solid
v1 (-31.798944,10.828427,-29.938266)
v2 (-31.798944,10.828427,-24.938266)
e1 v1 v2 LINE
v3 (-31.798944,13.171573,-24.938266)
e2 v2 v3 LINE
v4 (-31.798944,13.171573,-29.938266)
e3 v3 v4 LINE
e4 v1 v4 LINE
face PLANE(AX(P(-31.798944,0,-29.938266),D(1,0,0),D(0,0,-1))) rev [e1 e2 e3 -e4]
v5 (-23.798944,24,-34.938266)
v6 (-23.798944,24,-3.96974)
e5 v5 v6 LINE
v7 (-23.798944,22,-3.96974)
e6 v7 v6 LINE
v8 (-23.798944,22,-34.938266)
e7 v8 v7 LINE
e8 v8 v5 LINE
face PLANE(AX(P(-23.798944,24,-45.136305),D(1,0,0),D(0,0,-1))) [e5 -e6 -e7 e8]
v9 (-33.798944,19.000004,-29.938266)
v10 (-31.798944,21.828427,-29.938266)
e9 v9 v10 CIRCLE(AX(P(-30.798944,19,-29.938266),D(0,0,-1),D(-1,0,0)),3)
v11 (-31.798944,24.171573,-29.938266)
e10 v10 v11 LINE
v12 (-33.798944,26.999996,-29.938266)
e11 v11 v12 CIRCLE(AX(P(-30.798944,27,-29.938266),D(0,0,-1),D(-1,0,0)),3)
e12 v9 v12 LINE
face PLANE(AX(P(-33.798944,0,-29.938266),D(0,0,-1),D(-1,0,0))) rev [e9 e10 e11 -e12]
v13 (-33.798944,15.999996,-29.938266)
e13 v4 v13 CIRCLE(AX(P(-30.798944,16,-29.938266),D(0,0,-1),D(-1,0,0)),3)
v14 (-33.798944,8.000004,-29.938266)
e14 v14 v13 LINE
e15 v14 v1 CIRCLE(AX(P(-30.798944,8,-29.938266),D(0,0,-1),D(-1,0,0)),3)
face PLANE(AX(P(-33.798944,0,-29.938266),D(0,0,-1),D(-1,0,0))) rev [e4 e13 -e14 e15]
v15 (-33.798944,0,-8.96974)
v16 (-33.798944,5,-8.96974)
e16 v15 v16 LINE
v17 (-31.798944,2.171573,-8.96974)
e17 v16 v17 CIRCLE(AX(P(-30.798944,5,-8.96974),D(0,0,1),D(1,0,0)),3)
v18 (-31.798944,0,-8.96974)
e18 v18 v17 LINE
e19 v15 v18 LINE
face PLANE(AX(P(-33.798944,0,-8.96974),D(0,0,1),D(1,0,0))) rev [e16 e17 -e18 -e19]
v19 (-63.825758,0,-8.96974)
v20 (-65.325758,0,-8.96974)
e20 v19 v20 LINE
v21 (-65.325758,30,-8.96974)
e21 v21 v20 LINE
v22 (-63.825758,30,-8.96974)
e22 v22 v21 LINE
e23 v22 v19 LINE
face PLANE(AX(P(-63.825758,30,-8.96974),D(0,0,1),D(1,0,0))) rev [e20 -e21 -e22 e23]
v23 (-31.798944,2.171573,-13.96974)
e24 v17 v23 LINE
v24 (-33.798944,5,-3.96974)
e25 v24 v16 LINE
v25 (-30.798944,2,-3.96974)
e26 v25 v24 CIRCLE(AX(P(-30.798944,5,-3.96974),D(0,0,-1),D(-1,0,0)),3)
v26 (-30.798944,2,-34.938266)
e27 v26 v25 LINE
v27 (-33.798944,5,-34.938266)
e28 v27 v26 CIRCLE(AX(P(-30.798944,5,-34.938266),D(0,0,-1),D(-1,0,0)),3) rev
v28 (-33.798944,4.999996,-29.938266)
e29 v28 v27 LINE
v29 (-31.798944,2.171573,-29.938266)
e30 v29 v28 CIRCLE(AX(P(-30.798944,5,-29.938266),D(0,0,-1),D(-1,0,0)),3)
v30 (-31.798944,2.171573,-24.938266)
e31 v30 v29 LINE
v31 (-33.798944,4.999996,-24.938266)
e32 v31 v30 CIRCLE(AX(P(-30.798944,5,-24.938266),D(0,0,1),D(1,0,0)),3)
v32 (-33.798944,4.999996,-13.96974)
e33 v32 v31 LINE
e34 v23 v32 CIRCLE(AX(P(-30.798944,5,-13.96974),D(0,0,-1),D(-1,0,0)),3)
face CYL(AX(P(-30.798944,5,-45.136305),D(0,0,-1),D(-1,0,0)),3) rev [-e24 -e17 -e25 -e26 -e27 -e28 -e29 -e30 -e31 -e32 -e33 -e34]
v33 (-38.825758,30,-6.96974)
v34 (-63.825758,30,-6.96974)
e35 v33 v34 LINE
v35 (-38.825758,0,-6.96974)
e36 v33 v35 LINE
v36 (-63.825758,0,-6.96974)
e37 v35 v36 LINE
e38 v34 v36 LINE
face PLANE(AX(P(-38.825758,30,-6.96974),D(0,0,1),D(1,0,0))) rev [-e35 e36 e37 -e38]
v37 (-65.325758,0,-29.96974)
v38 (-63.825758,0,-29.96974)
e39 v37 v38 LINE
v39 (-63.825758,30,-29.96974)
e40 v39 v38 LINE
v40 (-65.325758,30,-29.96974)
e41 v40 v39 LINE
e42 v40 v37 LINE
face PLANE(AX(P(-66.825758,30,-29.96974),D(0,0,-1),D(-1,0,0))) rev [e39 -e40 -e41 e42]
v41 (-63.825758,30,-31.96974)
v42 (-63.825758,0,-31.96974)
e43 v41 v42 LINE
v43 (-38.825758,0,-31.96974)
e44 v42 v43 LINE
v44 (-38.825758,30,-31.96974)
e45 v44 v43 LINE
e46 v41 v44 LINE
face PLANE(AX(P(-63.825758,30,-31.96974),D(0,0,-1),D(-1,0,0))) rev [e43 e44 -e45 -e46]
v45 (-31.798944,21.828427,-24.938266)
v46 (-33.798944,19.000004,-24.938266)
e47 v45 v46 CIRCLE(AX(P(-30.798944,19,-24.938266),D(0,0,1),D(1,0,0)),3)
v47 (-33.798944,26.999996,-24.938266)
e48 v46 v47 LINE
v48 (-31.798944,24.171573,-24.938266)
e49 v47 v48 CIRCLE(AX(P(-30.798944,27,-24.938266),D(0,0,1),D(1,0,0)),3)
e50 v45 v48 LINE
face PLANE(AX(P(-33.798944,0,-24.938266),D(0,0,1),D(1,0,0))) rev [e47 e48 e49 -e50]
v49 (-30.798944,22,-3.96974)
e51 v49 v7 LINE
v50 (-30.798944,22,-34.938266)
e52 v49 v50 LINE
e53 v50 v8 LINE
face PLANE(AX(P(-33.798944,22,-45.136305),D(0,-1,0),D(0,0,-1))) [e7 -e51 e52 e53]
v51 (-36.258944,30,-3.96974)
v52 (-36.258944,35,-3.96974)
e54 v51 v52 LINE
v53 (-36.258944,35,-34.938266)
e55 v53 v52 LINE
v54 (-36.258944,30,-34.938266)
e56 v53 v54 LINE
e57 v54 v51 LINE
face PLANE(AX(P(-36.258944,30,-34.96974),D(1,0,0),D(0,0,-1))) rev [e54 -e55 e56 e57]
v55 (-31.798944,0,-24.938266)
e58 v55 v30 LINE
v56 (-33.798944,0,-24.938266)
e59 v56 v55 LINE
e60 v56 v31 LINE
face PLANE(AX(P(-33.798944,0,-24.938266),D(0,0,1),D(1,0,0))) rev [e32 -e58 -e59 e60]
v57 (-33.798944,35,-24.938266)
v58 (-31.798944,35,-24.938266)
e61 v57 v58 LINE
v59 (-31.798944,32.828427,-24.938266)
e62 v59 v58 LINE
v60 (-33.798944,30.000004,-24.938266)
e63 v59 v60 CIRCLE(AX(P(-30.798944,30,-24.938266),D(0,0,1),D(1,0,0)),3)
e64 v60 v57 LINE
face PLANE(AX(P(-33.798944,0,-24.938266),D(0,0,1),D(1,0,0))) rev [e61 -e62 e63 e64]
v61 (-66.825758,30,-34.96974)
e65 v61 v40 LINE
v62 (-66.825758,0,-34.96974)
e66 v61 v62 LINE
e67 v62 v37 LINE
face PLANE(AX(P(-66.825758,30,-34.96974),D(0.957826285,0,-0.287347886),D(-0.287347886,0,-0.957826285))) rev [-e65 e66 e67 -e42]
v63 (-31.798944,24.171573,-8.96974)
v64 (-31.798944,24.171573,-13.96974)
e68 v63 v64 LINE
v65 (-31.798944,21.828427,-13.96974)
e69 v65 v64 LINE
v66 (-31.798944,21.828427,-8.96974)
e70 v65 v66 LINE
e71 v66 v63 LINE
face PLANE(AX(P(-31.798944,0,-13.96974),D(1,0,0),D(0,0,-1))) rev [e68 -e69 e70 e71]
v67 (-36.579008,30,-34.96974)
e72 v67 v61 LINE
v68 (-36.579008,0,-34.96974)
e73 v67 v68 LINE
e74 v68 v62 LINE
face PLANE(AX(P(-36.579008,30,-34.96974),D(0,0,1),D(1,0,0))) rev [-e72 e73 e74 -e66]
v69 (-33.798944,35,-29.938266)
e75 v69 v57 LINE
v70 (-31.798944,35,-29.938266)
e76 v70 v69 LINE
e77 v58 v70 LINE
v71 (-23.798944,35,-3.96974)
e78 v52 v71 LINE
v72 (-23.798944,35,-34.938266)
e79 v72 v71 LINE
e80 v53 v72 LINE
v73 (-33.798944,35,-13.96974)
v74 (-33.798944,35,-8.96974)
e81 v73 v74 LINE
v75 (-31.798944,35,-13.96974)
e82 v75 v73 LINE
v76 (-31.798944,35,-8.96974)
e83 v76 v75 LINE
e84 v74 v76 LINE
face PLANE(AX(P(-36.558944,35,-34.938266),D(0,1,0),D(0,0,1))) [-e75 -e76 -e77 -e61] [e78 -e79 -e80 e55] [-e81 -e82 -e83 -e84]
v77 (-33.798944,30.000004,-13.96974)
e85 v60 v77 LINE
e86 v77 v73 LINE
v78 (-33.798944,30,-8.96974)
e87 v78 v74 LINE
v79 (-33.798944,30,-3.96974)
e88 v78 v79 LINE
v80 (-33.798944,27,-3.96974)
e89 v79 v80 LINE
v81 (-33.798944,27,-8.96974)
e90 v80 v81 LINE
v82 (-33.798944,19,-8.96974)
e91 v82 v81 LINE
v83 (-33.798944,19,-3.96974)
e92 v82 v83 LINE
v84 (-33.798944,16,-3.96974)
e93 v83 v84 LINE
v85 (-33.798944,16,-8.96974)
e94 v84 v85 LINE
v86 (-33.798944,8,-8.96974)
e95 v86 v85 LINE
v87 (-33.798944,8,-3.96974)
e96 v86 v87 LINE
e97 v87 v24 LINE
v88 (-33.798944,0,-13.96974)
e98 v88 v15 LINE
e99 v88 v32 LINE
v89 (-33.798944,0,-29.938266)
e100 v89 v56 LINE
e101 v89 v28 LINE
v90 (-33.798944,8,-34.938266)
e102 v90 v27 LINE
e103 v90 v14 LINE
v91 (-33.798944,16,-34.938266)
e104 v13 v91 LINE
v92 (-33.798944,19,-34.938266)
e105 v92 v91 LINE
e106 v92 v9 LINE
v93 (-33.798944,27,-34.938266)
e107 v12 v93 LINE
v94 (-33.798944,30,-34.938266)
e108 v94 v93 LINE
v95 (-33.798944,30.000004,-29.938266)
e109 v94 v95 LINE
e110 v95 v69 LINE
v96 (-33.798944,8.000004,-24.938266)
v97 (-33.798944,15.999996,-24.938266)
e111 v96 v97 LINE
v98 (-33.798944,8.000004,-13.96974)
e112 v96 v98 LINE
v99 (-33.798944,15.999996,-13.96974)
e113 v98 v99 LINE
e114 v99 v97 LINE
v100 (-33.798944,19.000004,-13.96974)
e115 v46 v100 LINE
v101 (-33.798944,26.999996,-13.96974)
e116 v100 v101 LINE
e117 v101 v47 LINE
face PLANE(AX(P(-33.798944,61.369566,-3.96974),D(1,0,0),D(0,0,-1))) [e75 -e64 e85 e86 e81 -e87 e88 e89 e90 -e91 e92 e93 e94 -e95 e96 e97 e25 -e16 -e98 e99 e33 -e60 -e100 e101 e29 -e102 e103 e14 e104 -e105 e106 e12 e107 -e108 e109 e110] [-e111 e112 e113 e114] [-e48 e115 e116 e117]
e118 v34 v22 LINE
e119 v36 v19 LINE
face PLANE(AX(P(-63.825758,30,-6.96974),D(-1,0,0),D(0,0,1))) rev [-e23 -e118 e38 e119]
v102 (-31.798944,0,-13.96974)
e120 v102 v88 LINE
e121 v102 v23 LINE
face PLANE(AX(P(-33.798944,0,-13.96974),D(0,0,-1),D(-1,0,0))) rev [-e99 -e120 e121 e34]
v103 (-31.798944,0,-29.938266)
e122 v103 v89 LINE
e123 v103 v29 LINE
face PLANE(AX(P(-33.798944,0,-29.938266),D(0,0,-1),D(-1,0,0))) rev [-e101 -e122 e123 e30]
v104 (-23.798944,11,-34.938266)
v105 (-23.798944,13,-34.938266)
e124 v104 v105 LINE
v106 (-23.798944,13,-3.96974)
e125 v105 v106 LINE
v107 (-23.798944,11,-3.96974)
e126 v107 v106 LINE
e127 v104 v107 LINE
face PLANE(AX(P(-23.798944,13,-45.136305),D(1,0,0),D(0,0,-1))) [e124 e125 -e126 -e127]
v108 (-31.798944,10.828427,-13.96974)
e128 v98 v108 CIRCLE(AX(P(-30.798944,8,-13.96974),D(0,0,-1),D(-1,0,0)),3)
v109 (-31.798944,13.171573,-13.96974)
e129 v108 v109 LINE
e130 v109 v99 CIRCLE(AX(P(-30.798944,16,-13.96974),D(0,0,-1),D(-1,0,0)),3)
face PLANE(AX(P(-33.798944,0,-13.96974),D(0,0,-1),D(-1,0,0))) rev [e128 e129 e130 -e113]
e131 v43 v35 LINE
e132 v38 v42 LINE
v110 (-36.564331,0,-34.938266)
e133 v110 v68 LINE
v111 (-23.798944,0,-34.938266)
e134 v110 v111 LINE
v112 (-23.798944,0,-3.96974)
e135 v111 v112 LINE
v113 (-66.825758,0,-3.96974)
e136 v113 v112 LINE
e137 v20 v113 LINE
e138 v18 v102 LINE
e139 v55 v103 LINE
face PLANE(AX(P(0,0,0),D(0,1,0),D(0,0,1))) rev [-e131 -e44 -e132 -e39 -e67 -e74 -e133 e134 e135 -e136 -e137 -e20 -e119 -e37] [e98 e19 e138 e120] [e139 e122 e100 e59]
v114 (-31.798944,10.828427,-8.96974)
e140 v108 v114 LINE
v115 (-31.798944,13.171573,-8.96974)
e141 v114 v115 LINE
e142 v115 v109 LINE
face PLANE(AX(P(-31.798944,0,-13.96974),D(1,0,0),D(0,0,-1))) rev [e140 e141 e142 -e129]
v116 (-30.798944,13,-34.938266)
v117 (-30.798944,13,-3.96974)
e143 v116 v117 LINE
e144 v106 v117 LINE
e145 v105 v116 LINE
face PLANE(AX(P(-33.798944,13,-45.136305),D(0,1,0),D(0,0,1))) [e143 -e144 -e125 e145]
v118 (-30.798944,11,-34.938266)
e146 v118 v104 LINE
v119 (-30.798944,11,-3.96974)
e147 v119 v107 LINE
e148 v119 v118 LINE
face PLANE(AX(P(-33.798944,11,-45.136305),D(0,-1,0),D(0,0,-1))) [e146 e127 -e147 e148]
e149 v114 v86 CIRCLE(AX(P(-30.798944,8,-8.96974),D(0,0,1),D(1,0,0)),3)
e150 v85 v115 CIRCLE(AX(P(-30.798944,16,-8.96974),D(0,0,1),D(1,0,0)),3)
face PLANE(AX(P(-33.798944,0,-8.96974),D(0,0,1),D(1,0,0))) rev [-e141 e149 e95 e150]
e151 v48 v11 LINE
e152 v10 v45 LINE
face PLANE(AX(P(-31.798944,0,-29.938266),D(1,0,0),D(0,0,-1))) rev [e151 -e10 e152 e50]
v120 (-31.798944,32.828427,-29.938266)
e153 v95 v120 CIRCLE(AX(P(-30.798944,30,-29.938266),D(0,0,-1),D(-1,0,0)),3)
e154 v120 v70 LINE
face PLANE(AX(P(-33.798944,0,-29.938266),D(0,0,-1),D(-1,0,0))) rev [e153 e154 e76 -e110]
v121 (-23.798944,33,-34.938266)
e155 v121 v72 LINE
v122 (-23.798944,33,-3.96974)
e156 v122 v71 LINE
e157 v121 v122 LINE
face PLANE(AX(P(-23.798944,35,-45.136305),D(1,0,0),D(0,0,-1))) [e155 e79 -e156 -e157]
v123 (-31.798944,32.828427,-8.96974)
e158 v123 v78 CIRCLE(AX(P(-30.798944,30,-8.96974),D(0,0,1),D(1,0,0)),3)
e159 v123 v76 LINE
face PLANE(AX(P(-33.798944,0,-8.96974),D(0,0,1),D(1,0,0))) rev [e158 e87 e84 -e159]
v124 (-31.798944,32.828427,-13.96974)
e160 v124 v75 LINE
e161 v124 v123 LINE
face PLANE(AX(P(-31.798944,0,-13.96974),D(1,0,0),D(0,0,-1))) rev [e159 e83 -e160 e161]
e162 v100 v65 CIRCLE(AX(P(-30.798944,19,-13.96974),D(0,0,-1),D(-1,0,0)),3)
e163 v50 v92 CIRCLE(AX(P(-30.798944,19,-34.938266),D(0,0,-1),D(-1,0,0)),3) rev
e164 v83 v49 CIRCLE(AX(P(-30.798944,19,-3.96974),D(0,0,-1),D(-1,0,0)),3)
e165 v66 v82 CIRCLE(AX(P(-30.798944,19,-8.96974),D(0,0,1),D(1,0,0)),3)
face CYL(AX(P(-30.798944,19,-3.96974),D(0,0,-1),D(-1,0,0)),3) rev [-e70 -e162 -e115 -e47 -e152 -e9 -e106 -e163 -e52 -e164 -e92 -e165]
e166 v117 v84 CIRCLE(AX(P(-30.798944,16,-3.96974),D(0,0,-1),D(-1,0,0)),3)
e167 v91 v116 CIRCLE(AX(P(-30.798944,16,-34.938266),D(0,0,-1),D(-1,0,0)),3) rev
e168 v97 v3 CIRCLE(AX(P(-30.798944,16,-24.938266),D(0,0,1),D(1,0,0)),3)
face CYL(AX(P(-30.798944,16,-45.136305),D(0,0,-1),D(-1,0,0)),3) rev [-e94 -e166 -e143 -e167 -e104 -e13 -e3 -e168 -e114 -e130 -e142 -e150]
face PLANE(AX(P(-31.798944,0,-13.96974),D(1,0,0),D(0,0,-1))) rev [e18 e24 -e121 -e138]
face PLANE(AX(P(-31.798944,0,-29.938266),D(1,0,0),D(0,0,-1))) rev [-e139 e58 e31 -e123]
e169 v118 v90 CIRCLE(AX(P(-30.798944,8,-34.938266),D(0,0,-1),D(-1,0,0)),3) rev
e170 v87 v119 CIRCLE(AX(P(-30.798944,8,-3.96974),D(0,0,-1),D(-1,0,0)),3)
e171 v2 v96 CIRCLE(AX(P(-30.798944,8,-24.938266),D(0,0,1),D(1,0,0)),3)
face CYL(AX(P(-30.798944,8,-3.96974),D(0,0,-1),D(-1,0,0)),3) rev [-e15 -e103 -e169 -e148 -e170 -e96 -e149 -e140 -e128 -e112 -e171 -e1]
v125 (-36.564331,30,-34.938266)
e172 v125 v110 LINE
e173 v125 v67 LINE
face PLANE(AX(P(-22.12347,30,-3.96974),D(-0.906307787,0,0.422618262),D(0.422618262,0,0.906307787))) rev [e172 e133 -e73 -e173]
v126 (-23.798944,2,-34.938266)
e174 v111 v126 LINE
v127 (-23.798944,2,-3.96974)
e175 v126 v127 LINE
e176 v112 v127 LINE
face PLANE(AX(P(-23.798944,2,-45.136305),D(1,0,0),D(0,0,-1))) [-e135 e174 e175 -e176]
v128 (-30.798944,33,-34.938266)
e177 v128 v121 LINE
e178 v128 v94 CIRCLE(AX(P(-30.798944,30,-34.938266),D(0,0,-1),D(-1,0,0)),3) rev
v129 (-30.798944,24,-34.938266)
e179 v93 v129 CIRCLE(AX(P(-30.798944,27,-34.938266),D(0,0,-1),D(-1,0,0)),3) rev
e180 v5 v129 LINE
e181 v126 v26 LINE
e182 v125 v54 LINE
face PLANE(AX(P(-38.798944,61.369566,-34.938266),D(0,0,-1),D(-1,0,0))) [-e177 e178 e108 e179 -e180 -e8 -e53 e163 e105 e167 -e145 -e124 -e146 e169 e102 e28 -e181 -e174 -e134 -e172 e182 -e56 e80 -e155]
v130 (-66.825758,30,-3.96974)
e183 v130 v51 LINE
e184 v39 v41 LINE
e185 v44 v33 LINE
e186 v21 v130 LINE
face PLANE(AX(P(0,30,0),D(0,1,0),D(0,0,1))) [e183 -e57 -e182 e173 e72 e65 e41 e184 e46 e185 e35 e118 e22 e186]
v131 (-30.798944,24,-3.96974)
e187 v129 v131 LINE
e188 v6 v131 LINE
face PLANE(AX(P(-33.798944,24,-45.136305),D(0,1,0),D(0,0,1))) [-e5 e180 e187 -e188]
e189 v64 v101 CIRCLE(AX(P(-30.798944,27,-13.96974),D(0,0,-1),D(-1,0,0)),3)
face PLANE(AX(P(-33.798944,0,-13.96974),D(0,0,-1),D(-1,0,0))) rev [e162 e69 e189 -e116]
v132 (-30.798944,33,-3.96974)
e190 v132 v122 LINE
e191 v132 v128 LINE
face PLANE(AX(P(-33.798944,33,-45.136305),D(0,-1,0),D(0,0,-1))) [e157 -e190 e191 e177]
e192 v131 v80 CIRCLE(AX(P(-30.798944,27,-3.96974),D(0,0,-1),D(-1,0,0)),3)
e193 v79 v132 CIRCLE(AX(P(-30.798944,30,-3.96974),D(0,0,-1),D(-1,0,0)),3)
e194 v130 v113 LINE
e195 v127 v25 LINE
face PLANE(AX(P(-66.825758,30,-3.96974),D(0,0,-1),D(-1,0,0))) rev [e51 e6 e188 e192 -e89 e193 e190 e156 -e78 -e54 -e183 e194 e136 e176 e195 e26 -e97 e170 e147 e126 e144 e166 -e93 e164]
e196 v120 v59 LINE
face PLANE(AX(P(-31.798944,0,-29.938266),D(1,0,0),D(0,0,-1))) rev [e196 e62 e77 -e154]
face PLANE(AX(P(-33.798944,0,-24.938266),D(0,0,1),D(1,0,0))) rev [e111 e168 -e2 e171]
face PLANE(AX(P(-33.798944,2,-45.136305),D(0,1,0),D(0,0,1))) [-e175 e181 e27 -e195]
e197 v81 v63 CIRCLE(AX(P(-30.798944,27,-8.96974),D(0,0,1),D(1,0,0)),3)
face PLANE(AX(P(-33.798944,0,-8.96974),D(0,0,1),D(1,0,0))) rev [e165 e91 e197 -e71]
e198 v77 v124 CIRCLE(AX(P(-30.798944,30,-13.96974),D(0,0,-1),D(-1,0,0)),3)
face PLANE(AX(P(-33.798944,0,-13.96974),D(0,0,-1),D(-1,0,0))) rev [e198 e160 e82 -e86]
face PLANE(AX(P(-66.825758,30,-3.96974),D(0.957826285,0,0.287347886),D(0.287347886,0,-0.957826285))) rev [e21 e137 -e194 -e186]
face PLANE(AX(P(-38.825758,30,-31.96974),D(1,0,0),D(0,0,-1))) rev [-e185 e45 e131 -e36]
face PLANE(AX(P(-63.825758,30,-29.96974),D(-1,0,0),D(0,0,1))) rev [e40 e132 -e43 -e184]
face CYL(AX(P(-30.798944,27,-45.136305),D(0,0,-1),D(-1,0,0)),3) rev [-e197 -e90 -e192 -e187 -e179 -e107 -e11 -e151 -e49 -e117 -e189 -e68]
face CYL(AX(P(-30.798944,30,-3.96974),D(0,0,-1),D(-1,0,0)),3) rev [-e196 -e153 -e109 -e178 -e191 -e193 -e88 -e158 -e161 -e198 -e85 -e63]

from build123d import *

# Parameters (mm, degrees)
EXTRUDE_1_DEPTH      = 30
CUT_EXTRUDE_4_DEPTH  = 82.16997337
SKETCH_7_W           = 16.60831278
SKETCH_7_H           = 38.473598513
CUT_EXTRUDE_14_DEPTH = 82.16997337
SKETCH_8_W           = 5
SKETCH_8_H           = 30.968526609
EXTRUDE_2_DEPTH      = 30
SKETCH_12_W          = 30.968526609
SKETCH_12_H          = 5
EXTRUDE_11_DEPTH     = 2.76
SKETCH_13_W          = 10
SKETCH_13_H          = 2
EXTRUDE_12_DEPTH     = 30.968526609
SKETCH_14_W          = 2
SKETCH_14_H          = 5
CUT_EXTRUDE_15_DEPTH = 84.147847698
FILLET_1_R           = 3
SKETCH_15_W          = 0.3
SKETCH_15_H          = 5
CUT_EXTRUDE_17_DEPTH = 82.55784374


with BuildPart() as part:
    # Эскиз1 → Бобышка-Вытянуть1 (new body)
    with BuildSketch(Plane(origin=(0, 0, 0), x_dir=(1, 0, 0), z_dir=(0, 1, 0))):
        Polygon((-66.825757576, 34.969739794), (-66.825757576, 29.969739794), (-63.825757576, 29.969739794), (-63.825757576, 31.969739794), (-38.825757576, 31.969739794), (-38.825757576, 6.969739794), (-63.825757576, 6.969739794), (-63.825757576, 8.969739794), (-66.825757576, 8.969739794), (-66.825757576, 3.969739794), (-22.123470102, 3.969739794), (-36.579007505, 34.969739794), align=None)
    extrude(amount=EXTRUDE_1_DEPTH)

    # Эскиз3 → Вырез-Вытянуть4 (cut, through all)
    with BuildSketch(Plane.XZ):
        Polygon((-66.825757576, -3.969739794), (-65.325757576, -8.969739794), (-66.825757576, -8.969739794), align=None)
        Polygon((-66.825757576, -29.969739794), (-66.825757576, -34.969739794), (-65.325757576, -29.969739794), align=None)
    extrude(amount=-CUT_EXTRUDE_4_DEPTH, mode=Mode.SUBTRACT)

    # Эскиз7 → Вырез-Вытянуть14 (cut, through all)
    with BuildSketch(Plane(origin=(0, 0, 0), x_dir=(-1, 0, 0), z_dir=(0, -1, 0))):
        with Locations((27.703474463, 20.539743139)):
            Rectangle(SKETCH_7_W, SKETCH_7_H)
    extrude(amount=-CUT_EXTRUDE_14_DEPTH, mode=Mode.SUBTRACT)

    # Эскиз8 → Бобышка-Вытянуть2 (add)
    with BuildSketch(Plane(origin=(0, 0, 0), x_dir=(-1, 0, 0), z_dir=(0, -1, 0))):
        with Locations((36.298943925, 19.454003098)):
            Rectangle(SKETCH_8_W, SKETCH_8_H)
    extrude(amount=-EXTRUDE_2_DEPTH)

    # Эскиз12 → Бобышка-Вытянуть11 (add)
    with BuildSketch(Plane(origin=(-33.798943925, 0, 0), x_dir=(0, 0, -1), z_dir=(1, 0, 0))):
        with Locations((19.454003098, 32.5)):
            Rectangle(SKETCH_12_W, SKETCH_12_H)
    extrude(amount=-EXTRUDE_11_DEPTH)

    # Эскиз13 → Бобышка-Вытянуть12 (add)
    with BuildSketch(Plane.XY.offset(-3.969739794)):
        with Locations((-28.798943925, 1)):
            Rectangle(SKETCH_13_W, SKETCH_13_H)
        with Locations((-28.798943925, 12)):
            Rectangle(SKETCH_13_W, SKETCH_13_H)
        with Locations((-28.798943925, 23)):
            Rectangle(SKETCH_13_W, SKETCH_13_H)
        with Locations((-28.798943925, 34)):
            Rectangle(SKETCH_13_W, SKETCH_13_H)
    extrude(amount=-EXTRUDE_12_DEPTH)

    # Эскиз14 → Вырез-Вытянуть15 (cut, through all)
    with BuildSketch(Plane(origin=(0, 35, 0), x_dir=(1, 0, 0), z_dir=(0, 1, 0))):
        with Locations((-32.798943925, 27.438266403)):
            Rectangle(SKETCH_14_W, SKETCH_14_H)
        with Locations((-32.798943925, 11.469739794)):
            Rectangle(SKETCH_14_W, SKETCH_14_H)
    extrude(amount=-CUT_EXTRUDE_15_DEPTH, mode=Mode.SUBTRACT)

    # Скругление1
    # the kernel refuses this fillet: 3 mm, written as the material it adds along each edge
    with BuildSketch(Plane(origin=(-33.798943925, 2, -22.438266403), x_dir=(0, 1, 0), z_dir=(0, 0, -1))) as fillet_1_piece_1_section:
        with BuildLine():
            CenterArc((FILLET_1_R, FILLET_1_R), FILLET_1_R, 180, 90)
            Line((0, FILLET_1_R), (0, 0))
            Line((0, 0), (FILLET_1_R, 0))
        make_face()
    fillet_1_piece_1 = extrude(amount=20, mode=Mode.PRIVATE)
    fillet_1_piece_1 = split(fillet_1_piece_1, bisect_by=Plane(origin=(-33.176423652, 2.688760919, -24.938266403), z_dir=(0, 0, 1)), keep=Keep.TOP, mode=Mode.PRIVATE)
    add(fillet_1_piece_1)
    with BuildSketch(Plane(origin=(-33.798943925, 2, -22.438266403), x_dir=(0, 1, 0), z_dir=(0, 0, -1))) as fillet_1_piece_2_section:
        with BuildLine():
            CenterArc((FILLET_1_R, FILLET_1_R), FILLET_1_R, 180, 90)
            Line((0, FILLET_1_R), (0, 0))
            Line((0, 0), (FILLET_1_R, 0))
        make_face()
    fillet_1_piece_2 = extrude(amount=12.5, mode=Mode.PRIVATE)
    fillet_1_piece_2 = split(fillet_1_piece_2, bisect_by=Plane(origin=(-31.798943925, 2.051209323, -27.438266403), z_dir=(1, 0, 0)), keep=Keep.TOP, mode=Mode.PRIVATE)
    add(fillet_1_piece_2)
    with BuildSketch(Plane(origin=(-33.798943925, 2, -29.938266403), x_dir=(0, 1, 0), z_dir=(0, 0, -1)), Plane(origin=(-33.798943925, 13, -29.938266403), x_dir=(0, 1, 0), z_dir=(0, 0, -1)), Plane(origin=(-33.798943925, 24, -29.938266403), x_dir=(0, 1, 0), z_dir=(0, 0, -1)), Plane(origin=(-33.798943925, 24, -3.969739794), x_dir=(0, 1, 0), z_dir=(0, 0, -1)), Plane(origin=(-33.798943925, 13, -3.969739794), x_dir=(0, 1, 0), z_dir=(0, 0, -1)), Plane(origin=(-33.798943925, 2, -3.969739794), x_dir=(0, 1, 0), z_dir=(0, 0, -1))) as fillet_1_piece_3:
        with BuildLine():
            CenterArc((FILLET_1_R, FILLET_1_R), FILLET_1_R, 180, 90)
            Line((0, FILLET_1_R), (0, 0))
            Line((0, 0), (FILLET_1_R, 0))
        make_face()
    extrude(amount=5)
    with BuildSketch(Plane(origin=(-33.798943925, 13, -22.438266403), x_dir=(0, 1, 0), z_dir=(0, 0, -1))) as fillet_1_piece_4_section:
        with BuildLine():
            CenterArc((FILLET_1_R, FILLET_1_R), FILLET_1_R, 180, 90)
            Line((0, FILLET_1_R), (0, 0))
            Line((0, 0), (FILLET_1_R, 0))
        make_face()
    fillet_1_piece_4 = extrude(amount=20, mode=Mode.PRIVATE)
    fillet_1_piece_4 = split(fillet_1_piece_4, bisect_by=Plane(origin=(-33.176423652, 13.688760919, -24.938266403), z_dir=(0, 0, 1)), keep=Keep.TOP, mode=Mode.PRIVATE)
    add(fillet_1_piece_4)
    with BuildSketch(Plane(origin=(-33.798943925, 13, -22.438266403), x_dir=(0, 1, 0), z_dir=(0, 0, -1))) as fillet_1_piece_5_section:
        with BuildLine():
            CenterArc((FILLET_1_R, FILLET_1_R), FILLET_1_R, 180, 90)
            Line((0, FILLET_1_R), (0, 0))
            Line((0, 0), (FILLET_1_R, 0))
        make_face()
    fillet_1_piece_5 = extrude(amount=12.5, mode=Mode.PRIVATE)
    fillet_1_piece_5 = split(fillet_1_piece_5, bisect_by=Plane(origin=(-31.798943925, 13.051209323, -27.438266403), z_dir=(1, 0, 0)), keep=Keep.TOP, mode=Mode.PRIVATE)
    add(fillet_1_piece_5)
    with BuildSketch(Plane(origin=(-33.798943925, 11, -22.438266403), x_dir=(0, -1, 0), z_dir=(0, 0, -1))) as fillet_1_piece_6_section:
        with BuildLine():
            CenterArc((FILLET_1_R, -FILLET_1_R), FILLET_1_R, 90, 90)
            Line((0, -FILLET_1_R), (0, 0))
            Line((0, 0), (FILLET_1_R, 0))
        make_face()
    fillet_1_piece_6 = extrude(amount=20, mode=Mode.PRIVATE)
    fillet_1_piece_6 = split(fillet_1_piece_6, bisect_by=Plane(origin=(-33.176423652, 10.311239081, -24.938266403), z_dir=(0, 0, 1)), keep=Keep.TOP, mode=Mode.PRIVATE)
    add(fillet_1_piece_6)
    with BuildSketch(Plane(origin=(-33.798943925, 11, -22.438266403), x_dir=(0, -1, 0), z_dir=(0, 0, -1))) as fillet_1_piece_7_section:
        with BuildLine():
            CenterArc((FILLET_1_R, -FILLET_1_R), FILLET_1_R, 90, 90)
            Line((0, -FILLET_1_R), (0, 0))
            Line((0, 0), (FILLET_1_R, 0))
        make_face()
    fillet_1_piece_7 = extrude(amount=12.5, mode=Mode.PRIVATE)
    fillet_1_piece_7 = split(fillet_1_piece_7, bisect_by=Plane(origin=(-31.798943925, 10.948790677, -27.438266403), z_dir=(1, 0, 0)), keep=Keep.TOP, mode=Mode.PRIVATE)
    add(fillet_1_piece_7)
    with BuildSketch(Plane(origin=(-33.798943925, 11, -29.938266403), x_dir=(0, -1, 0), z_dir=(0, 0, -1)), Plane(origin=(-33.798943925, 22, -29.938266403), x_dir=(0, -1, 0), z_dir=(0, 0, -1)), Plane(origin=(-33.798943925, 33, -29.938266403), x_dir=(0, -1, 0), z_dir=(0, 0, -1)), Plane(origin=(-33.798943925, 33, -3.969739794), x_dir=(0, -1, 0), z_dir=(0, 0, -1)), Plane(origin=(-33.798943925, 22, -3.969739794), x_dir=(0, -1, 0), z_dir=(0, 0, -1)), Plane(origin=(-33.798943925, 11, -3.969739794), x_dir=(0, -1, 0), z_dir=(0, 0, -1))) as fillet_1_piece_8:
        with BuildLine():
            CenterArc((FILLET_1_R, -FILLET_1_R), FILLET_1_R, 90, 90)
            Line((0, -FILLET_1_R), (0, 0))
            Line((0, 0), (FILLET_1_R, 0))
        make_face()
    extrude(amount=5)
    with BuildSketch(Plane(origin=(-33.798943925, 24, -22.438266403), x_dir=(0, 1, 0), z_dir=(0, 0, -1))) as fillet_1_piece_9_section:
        with BuildLine():
            CenterArc((FILLET_1_R, FILLET_1_R), FILLET_1_R, 180, 90)
            Line((0, FILLET_1_R), (0, 0))
            Line((0, 0), (FILLET_1_R, 0))
        make_face()
    fillet_1_piece_9 = extrude(amount=20, mode=Mode.PRIVATE)
    fillet_1_piece_9 = split(fillet_1_piece_9, bisect_by=Plane(origin=(-33.176423652, 24.688760919, -24.938266403), z_dir=(0, 0, 1)), keep=Keep.TOP, mode=Mode.PRIVATE)
    add(fillet_1_piece_9)
    with BuildSketch(Plane(origin=(-33.798943925, 24, -22.438266403), x_dir=(0, 1, 0), z_dir=(0, 0, -1))) as fillet_1_piece_10_section:
        with BuildLine():
            CenterArc((FILLET_1_R, FILLET_1_R), FILLET_1_R, 180, 90)
            Line((0, FILLET_1_R), (0, 0))
            Line((0, 0), (FILLET_1_R, 0))
        make_face()
    fillet_1_piece_10 = extrude(amount=12.5, mode=Mode.PRIVATE)
    fillet_1_piece_10 = split(fillet_1_piece_10, bisect_by=Plane(origin=(-31.798943925, 24.051209323, -27.438266403), z_dir=(1, 0, 0)), keep=Keep.TOP, mode=Mode.PRIVATE)
    add(fillet_1_piece_10)
    with BuildSketch(Plane(origin=(-33.798943925, 22, -22.438266403), x_dir=(0, -1, 0), z_dir=(0, 0, -1))) as fillet_1_piece_11_section:
        with BuildLine():
            CenterArc((FILLET_1_R, -FILLET_1_R), FILLET_1_R, 90, 90)
            Line((0, -FILLET_1_R), (0, 0))
            Line((0, 0), (FILLET_1_R, 0))
        make_face()
    fillet_1_piece_11 = extrude(amount=20, mode=Mode.PRIVATE)
    fillet_1_piece_11 = split(fillet_1_piece_11, bisect_by=Plane(origin=(-33.176423652, 21.311239081, -24.938266403), z_dir=(0, 0, 1)), keep=Keep.TOP, mode=Mode.PRIVATE)
    add(fillet_1_piece_11)
    with BuildSketch(Plane(origin=(-33.798943925, 22, -22.438266403), x_dir=(0, -1, 0), z_dir=(0, 0, -1))) as fillet_1_piece_12_section:
        with BuildLine():
            CenterArc((FILLET_1_R, -FILLET_1_R), FILLET_1_R, 90, 90)
            Line((0, -FILLET_1_R), (0, 0))
            Line((0, 0), (FILLET_1_R, 0))
        make_face()
    fillet_1_piece_12 = extrude(amount=12.5, mode=Mode.PRIVATE)
    fillet_1_piece_12 = split(fillet_1_piece_12, bisect_by=Plane(origin=(-31.798943925, 21.948790677, -27.438266403), z_dir=(1, 0, 0)), keep=Keep.TOP, mode=Mode.PRIVATE)
    add(fillet_1_piece_12)
    with BuildSketch(Plane(origin=(-33.798943925, 33, -22.438266403), x_dir=(0, -1, 0), z_dir=(0, 0, -1))) as fillet_1_piece_13_section:
        with BuildLine():
            CenterArc((FILLET_1_R, -FILLET_1_R), FILLET_1_R, 90, 90)
            Line((0, -FILLET_1_R), (0, 0))
            Line((0, 0), (FILLET_1_R, 0))
        make_face()
    fillet_1_piece_13 = extrude(amount=20, mode=Mode.PRIVATE)
    fillet_1_piece_13 = split(fillet_1_piece_13, bisect_by=Plane(origin=(-33.176423652, 32.311239081, -24.938266403), z_dir=(0, 0, 1)), keep=Keep.TOP, mode=Mode.PRIVATE)
    add(fillet_1_piece_13)
    with BuildSketch(Plane(origin=(-33.798943925, 33, -22.438266403), x_dir=(0, -1, 0), z_dir=(0, 0, -1))) as fillet_1_piece_14_section:
        with BuildLine():
            CenterArc((FILLET_1_R, -FILLET_1_R), FILLET_1_R, 90, 90)
            Line((0, -FILLET_1_R), (0, 0))
            Line((0, 0), (FILLET_1_R, 0))
        make_face()
    fillet_1_piece_14 = extrude(amount=12.5, mode=Mode.PRIVATE)
    fillet_1_piece_14 = split(fillet_1_piece_14, bisect_by=Plane(origin=(-31.798943925, 32.948790677, -27.438266403), z_dir=(1, 0, 0)), keep=Keep.TOP, mode=Mode.PRIVATE)
    add(fillet_1_piece_14)
    with BuildSketch(Plane(origin=(-33.798943925, 33, -6.469739794), x_dir=(0, -1, 0), z_dir=(0, 0, -1))) as fillet_1_piece_15_section:
        with BuildLine():
            CenterArc((FILLET_1_R, -FILLET_1_R), FILLET_1_R, 90, 90)
            Line((0, -FILLET_1_R), (0, 0))
            Line((0, 0), (FILLET_1_R, 0))
        make_face()
    fillet_1_piece_15 = extrude(amount=25.968526609, mode=Mode.PRIVATE)
    fillet_1_piece_15 = split(fillet_1_piece_15, bisect_by=Plane(origin=(-33.176423652, 32.311239081, -8.969739794), z_dir=(0, 0, 1)), keep=Keep.TOP, mode=Mode.PRIVATE)
    add(fillet_1_piece_15)
    with BuildSketch(Plane(origin=(-33.798943925, 33, -6.469739794), x_dir=(0, -1, 0), z_dir=(0, 0, -1))) as fillet_1_piece_16_section:
        with BuildLine():
            CenterArc((FILLET_1_R, -FILLET_1_R), FILLET_1_R, 90, 90)
            Line((0, -FILLET_1_R), (0, 0))
            Line((0, 0), (FILLET_1_R, 0))
        make_face()
    fillet_1_piece_16 = extrude(amount=25.968526609, mode=Mode.PRIVATE)
    fillet_1_piece_16 = split(fillet_1_piece_16, bisect_by=Plane(origin=(-31.798943925, 32.948790677, -11.469739794), z_dir=(1, 0, 0)), keep=Keep.TOP, mode=Mode.PRIVATE)
    add(fillet_1_piece_16)
    with BuildSketch(Plane(origin=(-33.798943925, 33, -13.969739794), x_dir=(0, -1, 0), z_dir=(0, 0, -1)), Plane(origin=(-33.798943925, 22, -13.969739794), x_dir=(0, -1, 0), z_dir=(0, 0, -1)), Plane(origin=(-33.798943925, 11, -13.969739794), x_dir=(0, -1, 0), z_dir=(0, 0, -1))) as fillet_1_piece_17:
        with BuildLine():
            CenterArc((FILLET_1_R, -FILLET_1_R), FILLET_1_R, 90, 90)
            Line((0, -FILLET_1_R), (0, 0))
            Line((0, 0), (FILLET_1_R, 0))
        make_face()
    extrude(amount=10.968526609)
    with BuildSketch(Plane(origin=(-33.798943925, 33, -6.469739794), x_dir=(0, -1, 0), z_dir=(0, 0, -1))) as fillet_1_piece_18_section:
        with BuildLine():
            CenterArc((FILLET_1_R, -FILLET_1_R), FILLET_1_R, 90, 90)
            Line((0, -FILLET_1_R), (0, 0))
            Line((0, 0), (FILLET_1_R, 0))
        make_face()
    fillet_1_piece_18 = extrude(amount=25.968526609, mode=Mode.PRIVATE)
    fillet_1_piece_18 = split(fillet_1_piece_18, bisect_by=Plane(origin=(-33.176423652, 32.311239081, -29.938266403), z_dir=(0, 0, -1)), keep=Keep.TOP, mode=Mode.PRIVATE)
    add(fillet_1_piece_18)
    with BuildSketch(Plane(origin=(-33.798943925, 33, 3.530260206), x_dir=(0, -1, 0), z_dir=(0, 0, -1))) as fillet_1_piece_19_section:
        with BuildLine():
            CenterArc((FILLET_1_R, -FILLET_1_R), FILLET_1_R, 90, 90)
            Line((0, -FILLET_1_R), (0, 0))
            Line((0, 0), (FILLET_1_R, 0))
        make_face()
    fillet_1_piece_19 = extrude(amount=20, mode=Mode.PRIVATE)
    fillet_1_piece_19 = split(fillet_1_piece_19, bisect_by=Plane(origin=(-31.550396037, 32.948790677, -8.969739794), z_dir=(0, 0, -1)), keep=Keep.TOP, mode=Mode.PRIVATE)
    fillet_1_piece_19 = split(fillet_1_piece_19, bisect_by=Plane(origin=(-31.798943925, 32.948790677, -11.469739794), z_dir=(1, 0, 0)), keep=Keep.TOP, mode=Mode.PRIVATE)
    add(fillet_1_piece_19)
    with BuildSketch(Plane(origin=(-33.798943925, 33, 3.530260206), x_dir=(0, -1, 0), z_dir=(0, 0, -1))) as fillet_1_piece_20_section:
        with BuildLine():
            CenterArc((FILLET_1_R, -FILLET_1_R), FILLET_1_R, 90, 90)
            Line((0, -FILLET_1_R), (0, 0))
            Line((0, 0), (FILLET_1_R, 0))
        make_face()
    fillet_1_piece_20 = extrude(amount=20, mode=Mode.PRIVATE)
    fillet_1_piece_20 = split(fillet_1_piece_20, bisect_by=Plane(origin=(-33.176423652, 32.311239081, -13.969739794), z_dir=(0, 0, -1)), keep=Keep.TOP, mode=Mode.PRIVATE)
    add(fillet_1_piece_20)
    with BuildSketch(Plane(origin=(-33.798943925, 24, -6.469739794), x_dir=(0, 1, 0), z_dir=(0, 0, -1))) as fillet_1_piece_21_section:
        with BuildLine():
            CenterArc((FILLET_1_R, FILLET_1_R), FILLET_1_R, 180, 90)
            Line((0, FILLET_1_R), (0, 0))
            Line((0, 0), (FILLET_1_R, 0))
        make_face()
    fillet_1_piece_21 = extrude(amount=25.968526609, mode=Mode.PRIVATE)
    fillet_1_piece_21 = split(fillet_1_piece_21, bisect_by=Plane(origin=(-33.176423652, 24.688760919, -8.969739794), z_dir=(0, 0, 1)), keep=Keep.TOP, mode=Mode.PRIVATE)
    add(fillet_1_piece_21)
    with BuildSketch(Plane(origin=(-33.798943925, 24, -6.469739794), x_dir=(0, 1, 0), z_dir=(0, 0, -1))) as fillet_1_piece_22_section:
        with BuildLine():
            CenterArc((FILLET_1_R, FILLET_1_R), FILLET_1_R, 180, 90)
            Line((0, FILLET_1_R), (0, 0))
            Line((0, 0), (FILLET_1_R, 0))
        make_face()
    fillet_1_piece_22 = extrude(amount=25.968526609, mode=Mode.PRIVATE)
    fillet_1_piece_22 = split(fillet_1_piece_22, bisect_by=Plane(origin=(-31.798943925, 24.051209323, -11.469739794), z_dir=(1, 0, 0)), keep=Keep.TOP, mode=Mode.PRIVATE)
    add(fillet_1_piece_22)
    with BuildSketch(Plane(origin=(-33.798943925, 24, -13.969739794), x_dir=(0, 1, 0), z_dir=(0, 0, -1)), Plane(origin=(-33.798943925, 13, -13.969739794), x_dir=(0, 1, 0), z_dir=(0, 0, -1)), Plane(origin=(-33.798943925, 2, -13.969739794), x_dir=(0, 1, 0), z_dir=(0, 0, -1))) as fillet_1_piece_23:
        with BuildLine():
            CenterArc((FILLET_1_R, FILLET_1_R), FILLET_1_R, 180, 90)
            Line((0, FILLET_1_R), (0, 0))
            Line((0, 0), (FILLET_1_R, 0))
        make_face()
    extrude(amount=10.968526609)
    with BuildSketch(Plane(origin=(-33.798943925, 24, -6.469739794), x_dir=(0, 1, 0), z_dir=(0, 0, -1))) as fillet_1_piece_24_section:
        with BuildLine():
            CenterArc((FILLET_1_R, FILLET_1_R), FILLET_1_R, 180, 90)
            Line((0, FILLET_1_R), (0, 0))
            Line((0, 0), (FILLET_1_R, 0))
        make_face()
    fillet_1_piece_24 = extrude(amount=25.968526609, mode=Mode.PRIVATE)
    fillet_1_piece_24 = split(fillet_1_piece_24, bisect_by=Plane(origin=(-33.176423652, 24.688760919, -29.938266403), z_dir=(0, 0, -1)), keep=Keep.TOP, mode=Mode.PRIVATE)
    add(fillet_1_piece_24)
    with BuildSketch(Plane(origin=(-33.798943925, 24, 3.530260206), x_dir=(0, 1, 0), z_dir=(0, 0, -1))) as fillet_1_piece_25_section:
        with BuildLine():
            CenterArc((FILLET_1_R, FILLET_1_R), FILLET_1_R, 180, 90)
            Line((0, FILLET_1_R), (0, 0))
            Line((0, 0), (FILLET_1_R, 0))
        make_face()
    fillet_1_piece_25 = extrude(amount=20, mode=Mode.PRIVATE)
    fillet_1_piece_25 = split(fillet_1_piece_25, bisect_by=Plane(origin=(-31.550396037, 24.051209323, -8.969739794), z_dir=(0, 0, -1)), keep=Keep.TOP, mode=Mode.PRIVATE)
    fillet_1_piece_25 = split(fillet_1_piece_25, bisect_by=Plane(origin=(-31.798943925, 24.051209323, -11.469739794), z_dir=(1, 0, 0)), keep=Keep.TOP, mode=Mode.PRIVATE)
    add(fillet_1_piece_25)
    with BuildSketch(Plane(origin=(-33.798943925, 24, 3.530260206), x_dir=(0, 1, 0), z_dir=(0, 0, -1))) as fillet_1_piece_26_section:
        with BuildLine():
            CenterArc((FILLET_1_R, FILLET_1_R), FILLET_1_R, 180, 90)
            Line((0, FILLET_1_R), (0, 0))
            Line((0, 0), (FILLET_1_R, 0))
        make_face()
    fillet_1_piece_26 = extrude(amount=20, mode=Mode.PRIVATE)
    fillet_1_piece_26 = split(fillet_1_piece_26, bisect_by=Plane(origin=(-33.176423652, 24.688760919, -13.969739794), z_dir=(0, 0, -1)), keep=Keep.TOP, mode=Mode.PRIVATE)
    add(fillet_1_piece_26)
    with BuildSketch(Plane(origin=(-33.798943925, 22, -6.469739794), x_dir=(0, -1, 0), z_dir=(0, 0, -1))) as fillet_1_piece_27_section:
        with BuildLine():
            CenterArc((FILLET_1_R, -FILLET_1_R), FILLET_1_R, 90, 90)
            Line((0, -FILLET_1_R), (0, 0))
            Line((0, 0), (FILLET_1_R, 0))
        make_face()
    fillet_1_piece_27 = extrude(amount=25.968526609, mode=Mode.PRIVATE)
    fillet_1_piece_27 = split(fillet_1_piece_27, bisect_by=Plane(origin=(-33.176423652, 21.311239081, -8.969739794), z_dir=(0, 0, 1)), keep=Keep.TOP, mode=Mode.PRIVATE)
    add(fillet_1_piece_27)
    with BuildSketch(Plane(origin=(-33.798943925, 22, -6.469739794), x_dir=(0, -1, 0), z_dir=(0, 0, -1))) as fillet_1_piece_28_section:
        with BuildLine():
            CenterArc((FILLET_1_R, -FILLET_1_R), FILLET_1_R, 90, 90)
            Line((0, -FILLET_1_R), (0, 0))
            Line((0, 0), (FILLET_1_R, 0))
        make_face()
    fillet_1_piece_28 = extrude(amount=25.968526609, mode=Mode.PRIVATE)
    fillet_1_piece_28 = split(fillet_1_piece_28, bisect_by=Plane(origin=(-31.798943925, 21.948790677, -11.469739794), z_dir=(1, 0, 0)), keep=Keep.TOP, mode=Mode.PRIVATE)
    add(fillet_1_piece_28)
    with BuildSketch(Plane(origin=(-33.798943925, 22, -6.469739794), x_dir=(0, -1, 0), z_dir=(0, 0, -1))) as fillet_1_piece_29_section:
        with BuildLine():
            CenterArc((FILLET_1_R, -FILLET_1_R), FILLET_1_R, 90, 90)
            Line((0, -FILLET_1_R), (0, 0))
            Line((0, 0), (FILLET_1_R, 0))
        make_face()
    fillet_1_piece_29 = extrude(amount=25.968526609, mode=Mode.PRIVATE)
    fillet_1_piece_29 = split(fillet_1_piece_29, bisect_by=Plane(origin=(-33.176423652, 21.311239081, -29.938266403), z_dir=(0, 0, -1)), keep=Keep.TOP, mode=Mode.PRIVATE)
    add(fillet_1_piece_29)
    with BuildSketch(Plane(origin=(-33.798943925, 22, 3.530260206), x_dir=(0, -1, 0), z_dir=(0, 0, -1))) as fillet_1_piece_30_section:
        with BuildLine():
            CenterArc((FILLET_1_R, -FILLET_1_R), FILLET_1_R, 90, 90)
            Line((0, -FILLET_1_R), (0, 0))
            Line((0, 0), (FILLET_1_R, 0))
        make_face()
    fillet_1_piece_30 = extrude(amount=20, mode=Mode.PRIVATE)
    fillet_1_piece_30 = split(fillet_1_piece_30, bisect_by=Plane(origin=(-31.550396037, 21.948790677, -8.969739794), z_dir=(0, 0, -1)), keep=Keep.TOP, mode=Mode.PRIVATE)
    fillet_1_piece_30 = split(fillet_1_piece_30, bisect_by=Plane(origin=(-31.798943925, 21.948790677, -11.469739794), z_dir=(1, 0, 0)), keep=Keep.TOP, mode=Mode.PRIVATE)
    add(fillet_1_piece_30)
    with BuildSketch(Plane(origin=(-33.798943925, 22, 3.530260206), x_dir=(0, -1, 0), z_dir=(0, 0, -1))) as fillet_1_piece_31_section:
        with BuildLine():
            CenterArc((FILLET_1_R, -FILLET_1_R), FILLET_1_R, 90, 90)
            Line((0, -FILLET_1_R), (0, 0))
            Line((0, 0), (FILLET_1_R, 0))
        make_face()
    fillet_1_piece_31 = extrude(amount=20, mode=Mode.PRIVATE)
    fillet_1_piece_31 = split(fillet_1_piece_31, bisect_by=Plane(origin=(-33.176423652, 21.311239081, -13.969739794), z_dir=(0, 0, -1)), keep=Keep.TOP, mode=Mode.PRIVATE)
    add(fillet_1_piece_31)
    with BuildSketch(Plane(origin=(-33.798943925, 13, -6.469739794), x_dir=(0, 1, 0), z_dir=(0, 0, -1))) as fillet_1_piece_32_section:
        with BuildLine():
            CenterArc((FILLET_1_R, FILLET_1_R), FILLET_1_R, 180, 90)
            Line((0, FILLET_1_R), (0, 0))
            Line((0, 0), (FILLET_1_R, 0))
        make_face()
    fillet_1_piece_32 = extrude(amount=25.968526609, mode=Mode.PRIVATE)
    fillet_1_piece_32 = split(fillet_1_piece_32, bisect_by=Plane(origin=(-33.176423652, 13.688760919, -8.969739794), z_dir=(0, 0, 1)), keep=Keep.TOP, mode=Mode.PRIVATE)
    add(fillet_1_piece_32)
    with BuildSketch(Plane(origin=(-33.798943925, 13, -6.469739794), x_dir=(0, 1, 0), z_dir=(0, 0, -1))) as fillet_1_piece_33_section:
        with BuildLine():
            CenterArc((FILLET_1_R, FILLET_1_R), FILLET_1_R, 180, 90)
            Line((0, FILLET_1_R), (0, 0))
            Line((0, 0), (FILLET_1_R, 0))
        make_face()
    fillet_1_piece_33 = extrude(amount=25.968526609, mode=Mode.PRIVATE)
    fillet_1_piece_33 = split(fillet_1_piece_33, bisect_by=Plane(origin=(-31.798943925, 13.051209323, -11.469739794), z_dir=(1, 0, 0)), keep=Keep.TOP, mode=Mode.PRIVATE)
    add(fillet_1_piece_33)
    with BuildSketch(Plane(origin=(-33.798943925, 13, -6.469739794), x_dir=(0, 1, 0), z_dir=(0, 0, -1))) as fillet_1_piece_34_section:
        with BuildLine():
            CenterArc((FILLET_1_R, FILLET_1_R), FILLET_1_R, 180, 90)
            Line((0, FILLET_1_R), (0, 0))
            Line((0, 0), (FILLET_1_R, 0))
        make_face()
    fillet_1_piece_34 = extrude(amount=25.968526609, mode=Mode.PRIVATE)
    fillet_1_piece_34 = split(fillet_1_piece_34, bisect_by=Plane(origin=(-33.176423652, 13.688760919, -29.938266403), z_dir=(0, 0, -1)), keep=Keep.TOP, mode=Mode.PRIVATE)
    add(fillet_1_piece_34)
    with BuildSketch(Plane(origin=(-33.798943925, 13, 3.530260206), x_dir=(0, 1, 0), z_dir=(0, 0, -1))) as fillet_1_piece_35_section:
        with BuildLine():
            CenterArc((FILLET_1_R, FILLET_1_R), FILLET_1_R, 180, 90)
            Line((0, FILLET_1_R), (0, 0))
            Line((0, 0), (FILLET_1_R, 0))
        make_face()
    fillet_1_piece_35 = extrude(amount=20, mode=Mode.PRIVATE)
    fillet_1_piece_35 = split(fillet_1_piece_35, bisect_by=Plane(origin=(-31.550396037, 13.051209323, -8.969739794), z_dir=(0, 0, -1)), keep=Keep.TOP, mode=Mode.PRIVATE)
    fillet_1_piece_35 = split(fillet_1_piece_35, bisect_by=Plane(origin=(-31.798943925, 13.051209323, -11.469739794), z_dir=(1, 0, 0)), keep=Keep.TOP, mode=Mode.PRIVATE)
    add(fillet_1_piece_35)
    with BuildSketch(Plane(origin=(-33.798943925, 13, 3.530260206), x_dir=(0, 1, 0), z_dir=(0, 0, -1))) as fillet_1_piece_36_section:
        with BuildLine():
            CenterArc((FILLET_1_R, FILLET_1_R), FILLET_1_R, 180, 90)
            Line((0, FILLET_1_R), (0, 0))
            Line((0, 0), (FILLET_1_R, 0))
        make_face()
    fillet_1_piece_36 = extrude(amount=20, mode=Mode.PRIVATE)
    fillet_1_piece_36 = split(fillet_1_piece_36, bisect_by=Plane(origin=(-33.176423652, 13.688760919, -13.969739794), z_dir=(0, 0, -1)), keep=Keep.TOP, mode=Mode.PRIVATE)
    add(fillet_1_piece_36)
    with BuildSketch(Plane(origin=(-33.798943925, 11, -6.469739794), x_dir=(0, -1, 0), z_dir=(0, 0, -1))) as fillet_1_piece_37_section:
        with BuildLine():
            CenterArc((FILLET_1_R, -FILLET_1_R), FILLET_1_R, 90, 90)
            Line((0, -FILLET_1_R), (0, 0))
            Line((0, 0), (FILLET_1_R, 0))
        make_face()
    fillet_1_piece_37 = extrude(amount=25.968526609, mode=Mode.PRIVATE)
    fillet_1_piece_37 = split(fillet_1_piece_37, bisect_by=Plane(origin=(-33.176423652, 10.311239081, -8.969739794), z_dir=(0, 0, 1)), keep=Keep.TOP, mode=Mode.PRIVATE)
    add(fillet_1_piece_37)
    with BuildSketch(Plane(origin=(-33.798943925, 11, -6.469739794), x_dir=(0, -1, 0), z_dir=(0, 0, -1))) as fillet_1_piece_38_section:
        with BuildLine():
            CenterArc((FILLET_1_R, -FILLET_1_R), FILLET_1_R, 90, 90)
            Line((0, -FILLET_1_R), (0, 0))
            Line((0, 0), (FILLET_1_R, 0))
        make_face()
    fillet_1_piece_38 = extrude(amount=25.968526609, mode=Mode.PRIVATE)
    fillet_1_piece_38 = split(fillet_1_piece_38, bisect_by=Plane(origin=(-31.798943925, 10.948790677, -11.469739794), z_dir=(1, 0, 0)), keep=Keep.TOP, mode=Mode.PRIVATE)
    add(fillet_1_piece_38)
    with BuildSketch(Plane(origin=(-33.798943925, 11, -6.469739794), x_dir=(0, -1, 0), z_dir=(0, 0, -1))) as fillet_1_piece_39_section:
        with BuildLine():
            CenterArc((FILLET_1_R, -FILLET_1_R), FILLET_1_R, 90, 90)
            Line((0, -FILLET_1_R), (0, 0))
            Line((0, 0), (FILLET_1_R, 0))
        make_face()
    fillet_1_piece_39 = extrude(amount=25.968526609, mode=Mode.PRIVATE)
    fillet_1_piece_39 = split(fillet_1_piece_39, bisect_by=Plane(origin=(-33.176423652, 10.311239081, -29.938266403), z_dir=(0, 0, -1)), keep=Keep.TOP, mode=Mode.PRIVATE)
    add(fillet_1_piece_39)
    with BuildSketch(Plane(origin=(-33.798943925, 11, 3.530260206), x_dir=(0, -1, 0), z_dir=(0, 0, -1))) as fillet_1_piece_40_section:
        with BuildLine():
            CenterArc((FILLET_1_R, -FILLET_1_R), FILLET_1_R, 90, 90)
            Line((0, -FILLET_1_R), (0, 0))
            Line((0, 0), (FILLET_1_R, 0))
        make_face()
    fillet_1_piece_40 = extrude(amount=20, mode=Mode.PRIVATE)
    fillet_1_piece_40 = split(fillet_1_piece_40, bisect_by=Plane(origin=(-31.550396037, 10.948790677, -8.969739794), z_dir=(0, 0, -1)), keep=Keep.TOP, mode=Mode.PRIVATE)
    fillet_1_piece_40 = split(fillet_1_piece_40, bisect_by=Plane(origin=(-31.798943925, 10.948790677, -11.469739794), z_dir=(1, 0, 0)), keep=Keep.TOP, mode=Mode.PRIVATE)
    add(fillet_1_piece_40)
    with BuildSketch(Plane(origin=(-33.798943925, 11, 3.530260206), x_dir=(0, -1, 0), z_dir=(0, 0, -1))) as fillet_1_piece_41_section:
        with BuildLine():
            CenterArc((FILLET_1_R, -FILLET_1_R), FILLET_1_R, 90, 90)
            Line((0, -FILLET_1_R), (0, 0))
            Line((0, 0), (FILLET_1_R, 0))
        make_face()
    fillet_1_piece_41 = extrude(amount=20, mode=Mode.PRIVATE)
    fillet_1_piece_41 = split(fillet_1_piece_41, bisect_by=Plane(origin=(-33.176423652, 10.311239081, -13.969739794), z_dir=(0, 0, -1)), keep=Keep.TOP, mode=Mode.PRIVATE)
    add(fillet_1_piece_41)
    with BuildSketch(Plane(origin=(-33.798943925, 2, -6.469739794), x_dir=(0, 1, 0), z_dir=(0, 0, -1))) as fillet_1_piece_42_section:
        with BuildLine():
            CenterArc((FILLET_1_R, FILLET_1_R), FILLET_1_R, 180, 90)
            Line((0, FILLET_1_R), (0, 0))
            Line((0, 0), (FILLET_1_R, 0))
        make_face()
    fillet_1_piece_42 = extrude(amount=25.968526609, mode=Mode.PRIVATE)
    fillet_1_piece_42 = split(fillet_1_piece_42, bisect_by=Plane(origin=(-33.176423652, 2.688760919, -8.969739794), z_dir=(0, 0, 1)), keep=Keep.TOP, mode=Mode.PRIVATE)
    add(fillet_1_piece_42)
    with BuildSketch(Plane(origin=(-33.798943925, 2, -6.469739794), x_dir=(0, 1, 0), z_dir=(0, 0, -1))) as fillet_1_piece_43_section:
        with BuildLine():
            CenterArc((FILLET_1_R, FILLET_1_R), FILLET_1_R, 180, 90)
            Line((0, FILLET_1_R), (0, 0))
            Line((0, 0), (FILLET_1_R, 0))
        make_face()
    fillet_1_piece_43 = extrude(amount=25.968526609, mode=Mode.PRIVATE)
    fillet_1_piece_43 = split(fillet_1_piece_43, bisect_by=Plane(origin=(-31.798943925, 2.051209323, -11.469739794), z_dir=(1, 0, 0)), keep=Keep.TOP, mode=Mode.PRIVATE)
    add(fillet_1_piece_43)
    with BuildSketch(Plane(origin=(-33.798943925, 2, -6.469739794), x_dir=(0, 1, 0), z_dir=(0, 0, -1))) as fillet_1_piece_44_section:
        with BuildLine():
            CenterArc((FILLET_1_R, FILLET_1_R), FILLET_1_R, 180, 90)
            Line((0, FILLET_1_R), (0, 0))
            Line((0, 0), (FILLET_1_R, 0))
        make_face()
    fillet_1_piece_44 = extrude(amount=25.968526609, mode=Mode.PRIVATE)
    fillet_1_piece_44 = split(fillet_1_piece_44, bisect_by=Plane(origin=(-33.176423652, 2.688760919, -29.938266403), z_dir=(0, 0, -1)), keep=Keep.TOP, mode=Mode.PRIVATE)
    add(fillet_1_piece_44)
    with BuildSketch(Plane(origin=(-33.798943925, 2, 3.530260206), x_dir=(0, 1, 0), z_dir=(0, 0, -1))) as fillet_1_piece_45_section:
        with BuildLine():
            CenterArc((FILLET_1_R, FILLET_1_R), FILLET_1_R, 180, 90)
            Line((0, FILLET_1_R), (0, 0))
            Line((0, 0), (FILLET_1_R, 0))
        make_face()
    fillet_1_piece_45 = extrude(amount=20, mode=Mode.PRIVATE)
    fillet_1_piece_45 = split(fillet_1_piece_45, bisect_by=Plane(origin=(-31.550396037, 2.051209323, -8.969739794), z_dir=(0, 0, -1)), keep=Keep.TOP, mode=Mode.PRIVATE)
    fillet_1_piece_45 = split(fillet_1_piece_45, bisect_by=Plane(origin=(-31.798943925, 2.051209323, -11.469739794), z_dir=(1, 0, 0)), keep=Keep.TOP, mode=Mode.PRIVATE)
    add(fillet_1_piece_45)
    with BuildSketch(Plane(origin=(-33.798943925, 2, 3.530260206), x_dir=(0, 1, 0), z_dir=(0, 0, -1))) as fillet_1_piece_46_section:
        with BuildLine():
            CenterArc((FILLET_1_R, FILLET_1_R), FILLET_1_R, 180, 90)
            Line((0, FILLET_1_R), (0, 0))
            Line((0, 0), (FILLET_1_R, 0))
        make_face()
    fillet_1_piece_46 = extrude(amount=20, mode=Mode.PRIVATE)
    fillet_1_piece_46 = split(fillet_1_piece_46, bisect_by=Plane(origin=(-33.176423652, 2.688760919, -13.969739794), z_dir=(0, 0, -1)), keep=Keep.TOP, mode=Mode.PRIVATE)
    add(fillet_1_piece_46)

    # Эскиз15 → Вырез-Вытянуть17 (cut, through all)
    with BuildSketch(Plane.XY.offset(-3.969739794)):
        with Locations((-36.408943925, 32.5)):
            Rectangle(SKETCH_15_W, SKETCH_15_H)
    extrude(amount=-CUT_EXTRUDE_17_DEPTH, mode=Mode.SUBTRACT)


solid = part.part
